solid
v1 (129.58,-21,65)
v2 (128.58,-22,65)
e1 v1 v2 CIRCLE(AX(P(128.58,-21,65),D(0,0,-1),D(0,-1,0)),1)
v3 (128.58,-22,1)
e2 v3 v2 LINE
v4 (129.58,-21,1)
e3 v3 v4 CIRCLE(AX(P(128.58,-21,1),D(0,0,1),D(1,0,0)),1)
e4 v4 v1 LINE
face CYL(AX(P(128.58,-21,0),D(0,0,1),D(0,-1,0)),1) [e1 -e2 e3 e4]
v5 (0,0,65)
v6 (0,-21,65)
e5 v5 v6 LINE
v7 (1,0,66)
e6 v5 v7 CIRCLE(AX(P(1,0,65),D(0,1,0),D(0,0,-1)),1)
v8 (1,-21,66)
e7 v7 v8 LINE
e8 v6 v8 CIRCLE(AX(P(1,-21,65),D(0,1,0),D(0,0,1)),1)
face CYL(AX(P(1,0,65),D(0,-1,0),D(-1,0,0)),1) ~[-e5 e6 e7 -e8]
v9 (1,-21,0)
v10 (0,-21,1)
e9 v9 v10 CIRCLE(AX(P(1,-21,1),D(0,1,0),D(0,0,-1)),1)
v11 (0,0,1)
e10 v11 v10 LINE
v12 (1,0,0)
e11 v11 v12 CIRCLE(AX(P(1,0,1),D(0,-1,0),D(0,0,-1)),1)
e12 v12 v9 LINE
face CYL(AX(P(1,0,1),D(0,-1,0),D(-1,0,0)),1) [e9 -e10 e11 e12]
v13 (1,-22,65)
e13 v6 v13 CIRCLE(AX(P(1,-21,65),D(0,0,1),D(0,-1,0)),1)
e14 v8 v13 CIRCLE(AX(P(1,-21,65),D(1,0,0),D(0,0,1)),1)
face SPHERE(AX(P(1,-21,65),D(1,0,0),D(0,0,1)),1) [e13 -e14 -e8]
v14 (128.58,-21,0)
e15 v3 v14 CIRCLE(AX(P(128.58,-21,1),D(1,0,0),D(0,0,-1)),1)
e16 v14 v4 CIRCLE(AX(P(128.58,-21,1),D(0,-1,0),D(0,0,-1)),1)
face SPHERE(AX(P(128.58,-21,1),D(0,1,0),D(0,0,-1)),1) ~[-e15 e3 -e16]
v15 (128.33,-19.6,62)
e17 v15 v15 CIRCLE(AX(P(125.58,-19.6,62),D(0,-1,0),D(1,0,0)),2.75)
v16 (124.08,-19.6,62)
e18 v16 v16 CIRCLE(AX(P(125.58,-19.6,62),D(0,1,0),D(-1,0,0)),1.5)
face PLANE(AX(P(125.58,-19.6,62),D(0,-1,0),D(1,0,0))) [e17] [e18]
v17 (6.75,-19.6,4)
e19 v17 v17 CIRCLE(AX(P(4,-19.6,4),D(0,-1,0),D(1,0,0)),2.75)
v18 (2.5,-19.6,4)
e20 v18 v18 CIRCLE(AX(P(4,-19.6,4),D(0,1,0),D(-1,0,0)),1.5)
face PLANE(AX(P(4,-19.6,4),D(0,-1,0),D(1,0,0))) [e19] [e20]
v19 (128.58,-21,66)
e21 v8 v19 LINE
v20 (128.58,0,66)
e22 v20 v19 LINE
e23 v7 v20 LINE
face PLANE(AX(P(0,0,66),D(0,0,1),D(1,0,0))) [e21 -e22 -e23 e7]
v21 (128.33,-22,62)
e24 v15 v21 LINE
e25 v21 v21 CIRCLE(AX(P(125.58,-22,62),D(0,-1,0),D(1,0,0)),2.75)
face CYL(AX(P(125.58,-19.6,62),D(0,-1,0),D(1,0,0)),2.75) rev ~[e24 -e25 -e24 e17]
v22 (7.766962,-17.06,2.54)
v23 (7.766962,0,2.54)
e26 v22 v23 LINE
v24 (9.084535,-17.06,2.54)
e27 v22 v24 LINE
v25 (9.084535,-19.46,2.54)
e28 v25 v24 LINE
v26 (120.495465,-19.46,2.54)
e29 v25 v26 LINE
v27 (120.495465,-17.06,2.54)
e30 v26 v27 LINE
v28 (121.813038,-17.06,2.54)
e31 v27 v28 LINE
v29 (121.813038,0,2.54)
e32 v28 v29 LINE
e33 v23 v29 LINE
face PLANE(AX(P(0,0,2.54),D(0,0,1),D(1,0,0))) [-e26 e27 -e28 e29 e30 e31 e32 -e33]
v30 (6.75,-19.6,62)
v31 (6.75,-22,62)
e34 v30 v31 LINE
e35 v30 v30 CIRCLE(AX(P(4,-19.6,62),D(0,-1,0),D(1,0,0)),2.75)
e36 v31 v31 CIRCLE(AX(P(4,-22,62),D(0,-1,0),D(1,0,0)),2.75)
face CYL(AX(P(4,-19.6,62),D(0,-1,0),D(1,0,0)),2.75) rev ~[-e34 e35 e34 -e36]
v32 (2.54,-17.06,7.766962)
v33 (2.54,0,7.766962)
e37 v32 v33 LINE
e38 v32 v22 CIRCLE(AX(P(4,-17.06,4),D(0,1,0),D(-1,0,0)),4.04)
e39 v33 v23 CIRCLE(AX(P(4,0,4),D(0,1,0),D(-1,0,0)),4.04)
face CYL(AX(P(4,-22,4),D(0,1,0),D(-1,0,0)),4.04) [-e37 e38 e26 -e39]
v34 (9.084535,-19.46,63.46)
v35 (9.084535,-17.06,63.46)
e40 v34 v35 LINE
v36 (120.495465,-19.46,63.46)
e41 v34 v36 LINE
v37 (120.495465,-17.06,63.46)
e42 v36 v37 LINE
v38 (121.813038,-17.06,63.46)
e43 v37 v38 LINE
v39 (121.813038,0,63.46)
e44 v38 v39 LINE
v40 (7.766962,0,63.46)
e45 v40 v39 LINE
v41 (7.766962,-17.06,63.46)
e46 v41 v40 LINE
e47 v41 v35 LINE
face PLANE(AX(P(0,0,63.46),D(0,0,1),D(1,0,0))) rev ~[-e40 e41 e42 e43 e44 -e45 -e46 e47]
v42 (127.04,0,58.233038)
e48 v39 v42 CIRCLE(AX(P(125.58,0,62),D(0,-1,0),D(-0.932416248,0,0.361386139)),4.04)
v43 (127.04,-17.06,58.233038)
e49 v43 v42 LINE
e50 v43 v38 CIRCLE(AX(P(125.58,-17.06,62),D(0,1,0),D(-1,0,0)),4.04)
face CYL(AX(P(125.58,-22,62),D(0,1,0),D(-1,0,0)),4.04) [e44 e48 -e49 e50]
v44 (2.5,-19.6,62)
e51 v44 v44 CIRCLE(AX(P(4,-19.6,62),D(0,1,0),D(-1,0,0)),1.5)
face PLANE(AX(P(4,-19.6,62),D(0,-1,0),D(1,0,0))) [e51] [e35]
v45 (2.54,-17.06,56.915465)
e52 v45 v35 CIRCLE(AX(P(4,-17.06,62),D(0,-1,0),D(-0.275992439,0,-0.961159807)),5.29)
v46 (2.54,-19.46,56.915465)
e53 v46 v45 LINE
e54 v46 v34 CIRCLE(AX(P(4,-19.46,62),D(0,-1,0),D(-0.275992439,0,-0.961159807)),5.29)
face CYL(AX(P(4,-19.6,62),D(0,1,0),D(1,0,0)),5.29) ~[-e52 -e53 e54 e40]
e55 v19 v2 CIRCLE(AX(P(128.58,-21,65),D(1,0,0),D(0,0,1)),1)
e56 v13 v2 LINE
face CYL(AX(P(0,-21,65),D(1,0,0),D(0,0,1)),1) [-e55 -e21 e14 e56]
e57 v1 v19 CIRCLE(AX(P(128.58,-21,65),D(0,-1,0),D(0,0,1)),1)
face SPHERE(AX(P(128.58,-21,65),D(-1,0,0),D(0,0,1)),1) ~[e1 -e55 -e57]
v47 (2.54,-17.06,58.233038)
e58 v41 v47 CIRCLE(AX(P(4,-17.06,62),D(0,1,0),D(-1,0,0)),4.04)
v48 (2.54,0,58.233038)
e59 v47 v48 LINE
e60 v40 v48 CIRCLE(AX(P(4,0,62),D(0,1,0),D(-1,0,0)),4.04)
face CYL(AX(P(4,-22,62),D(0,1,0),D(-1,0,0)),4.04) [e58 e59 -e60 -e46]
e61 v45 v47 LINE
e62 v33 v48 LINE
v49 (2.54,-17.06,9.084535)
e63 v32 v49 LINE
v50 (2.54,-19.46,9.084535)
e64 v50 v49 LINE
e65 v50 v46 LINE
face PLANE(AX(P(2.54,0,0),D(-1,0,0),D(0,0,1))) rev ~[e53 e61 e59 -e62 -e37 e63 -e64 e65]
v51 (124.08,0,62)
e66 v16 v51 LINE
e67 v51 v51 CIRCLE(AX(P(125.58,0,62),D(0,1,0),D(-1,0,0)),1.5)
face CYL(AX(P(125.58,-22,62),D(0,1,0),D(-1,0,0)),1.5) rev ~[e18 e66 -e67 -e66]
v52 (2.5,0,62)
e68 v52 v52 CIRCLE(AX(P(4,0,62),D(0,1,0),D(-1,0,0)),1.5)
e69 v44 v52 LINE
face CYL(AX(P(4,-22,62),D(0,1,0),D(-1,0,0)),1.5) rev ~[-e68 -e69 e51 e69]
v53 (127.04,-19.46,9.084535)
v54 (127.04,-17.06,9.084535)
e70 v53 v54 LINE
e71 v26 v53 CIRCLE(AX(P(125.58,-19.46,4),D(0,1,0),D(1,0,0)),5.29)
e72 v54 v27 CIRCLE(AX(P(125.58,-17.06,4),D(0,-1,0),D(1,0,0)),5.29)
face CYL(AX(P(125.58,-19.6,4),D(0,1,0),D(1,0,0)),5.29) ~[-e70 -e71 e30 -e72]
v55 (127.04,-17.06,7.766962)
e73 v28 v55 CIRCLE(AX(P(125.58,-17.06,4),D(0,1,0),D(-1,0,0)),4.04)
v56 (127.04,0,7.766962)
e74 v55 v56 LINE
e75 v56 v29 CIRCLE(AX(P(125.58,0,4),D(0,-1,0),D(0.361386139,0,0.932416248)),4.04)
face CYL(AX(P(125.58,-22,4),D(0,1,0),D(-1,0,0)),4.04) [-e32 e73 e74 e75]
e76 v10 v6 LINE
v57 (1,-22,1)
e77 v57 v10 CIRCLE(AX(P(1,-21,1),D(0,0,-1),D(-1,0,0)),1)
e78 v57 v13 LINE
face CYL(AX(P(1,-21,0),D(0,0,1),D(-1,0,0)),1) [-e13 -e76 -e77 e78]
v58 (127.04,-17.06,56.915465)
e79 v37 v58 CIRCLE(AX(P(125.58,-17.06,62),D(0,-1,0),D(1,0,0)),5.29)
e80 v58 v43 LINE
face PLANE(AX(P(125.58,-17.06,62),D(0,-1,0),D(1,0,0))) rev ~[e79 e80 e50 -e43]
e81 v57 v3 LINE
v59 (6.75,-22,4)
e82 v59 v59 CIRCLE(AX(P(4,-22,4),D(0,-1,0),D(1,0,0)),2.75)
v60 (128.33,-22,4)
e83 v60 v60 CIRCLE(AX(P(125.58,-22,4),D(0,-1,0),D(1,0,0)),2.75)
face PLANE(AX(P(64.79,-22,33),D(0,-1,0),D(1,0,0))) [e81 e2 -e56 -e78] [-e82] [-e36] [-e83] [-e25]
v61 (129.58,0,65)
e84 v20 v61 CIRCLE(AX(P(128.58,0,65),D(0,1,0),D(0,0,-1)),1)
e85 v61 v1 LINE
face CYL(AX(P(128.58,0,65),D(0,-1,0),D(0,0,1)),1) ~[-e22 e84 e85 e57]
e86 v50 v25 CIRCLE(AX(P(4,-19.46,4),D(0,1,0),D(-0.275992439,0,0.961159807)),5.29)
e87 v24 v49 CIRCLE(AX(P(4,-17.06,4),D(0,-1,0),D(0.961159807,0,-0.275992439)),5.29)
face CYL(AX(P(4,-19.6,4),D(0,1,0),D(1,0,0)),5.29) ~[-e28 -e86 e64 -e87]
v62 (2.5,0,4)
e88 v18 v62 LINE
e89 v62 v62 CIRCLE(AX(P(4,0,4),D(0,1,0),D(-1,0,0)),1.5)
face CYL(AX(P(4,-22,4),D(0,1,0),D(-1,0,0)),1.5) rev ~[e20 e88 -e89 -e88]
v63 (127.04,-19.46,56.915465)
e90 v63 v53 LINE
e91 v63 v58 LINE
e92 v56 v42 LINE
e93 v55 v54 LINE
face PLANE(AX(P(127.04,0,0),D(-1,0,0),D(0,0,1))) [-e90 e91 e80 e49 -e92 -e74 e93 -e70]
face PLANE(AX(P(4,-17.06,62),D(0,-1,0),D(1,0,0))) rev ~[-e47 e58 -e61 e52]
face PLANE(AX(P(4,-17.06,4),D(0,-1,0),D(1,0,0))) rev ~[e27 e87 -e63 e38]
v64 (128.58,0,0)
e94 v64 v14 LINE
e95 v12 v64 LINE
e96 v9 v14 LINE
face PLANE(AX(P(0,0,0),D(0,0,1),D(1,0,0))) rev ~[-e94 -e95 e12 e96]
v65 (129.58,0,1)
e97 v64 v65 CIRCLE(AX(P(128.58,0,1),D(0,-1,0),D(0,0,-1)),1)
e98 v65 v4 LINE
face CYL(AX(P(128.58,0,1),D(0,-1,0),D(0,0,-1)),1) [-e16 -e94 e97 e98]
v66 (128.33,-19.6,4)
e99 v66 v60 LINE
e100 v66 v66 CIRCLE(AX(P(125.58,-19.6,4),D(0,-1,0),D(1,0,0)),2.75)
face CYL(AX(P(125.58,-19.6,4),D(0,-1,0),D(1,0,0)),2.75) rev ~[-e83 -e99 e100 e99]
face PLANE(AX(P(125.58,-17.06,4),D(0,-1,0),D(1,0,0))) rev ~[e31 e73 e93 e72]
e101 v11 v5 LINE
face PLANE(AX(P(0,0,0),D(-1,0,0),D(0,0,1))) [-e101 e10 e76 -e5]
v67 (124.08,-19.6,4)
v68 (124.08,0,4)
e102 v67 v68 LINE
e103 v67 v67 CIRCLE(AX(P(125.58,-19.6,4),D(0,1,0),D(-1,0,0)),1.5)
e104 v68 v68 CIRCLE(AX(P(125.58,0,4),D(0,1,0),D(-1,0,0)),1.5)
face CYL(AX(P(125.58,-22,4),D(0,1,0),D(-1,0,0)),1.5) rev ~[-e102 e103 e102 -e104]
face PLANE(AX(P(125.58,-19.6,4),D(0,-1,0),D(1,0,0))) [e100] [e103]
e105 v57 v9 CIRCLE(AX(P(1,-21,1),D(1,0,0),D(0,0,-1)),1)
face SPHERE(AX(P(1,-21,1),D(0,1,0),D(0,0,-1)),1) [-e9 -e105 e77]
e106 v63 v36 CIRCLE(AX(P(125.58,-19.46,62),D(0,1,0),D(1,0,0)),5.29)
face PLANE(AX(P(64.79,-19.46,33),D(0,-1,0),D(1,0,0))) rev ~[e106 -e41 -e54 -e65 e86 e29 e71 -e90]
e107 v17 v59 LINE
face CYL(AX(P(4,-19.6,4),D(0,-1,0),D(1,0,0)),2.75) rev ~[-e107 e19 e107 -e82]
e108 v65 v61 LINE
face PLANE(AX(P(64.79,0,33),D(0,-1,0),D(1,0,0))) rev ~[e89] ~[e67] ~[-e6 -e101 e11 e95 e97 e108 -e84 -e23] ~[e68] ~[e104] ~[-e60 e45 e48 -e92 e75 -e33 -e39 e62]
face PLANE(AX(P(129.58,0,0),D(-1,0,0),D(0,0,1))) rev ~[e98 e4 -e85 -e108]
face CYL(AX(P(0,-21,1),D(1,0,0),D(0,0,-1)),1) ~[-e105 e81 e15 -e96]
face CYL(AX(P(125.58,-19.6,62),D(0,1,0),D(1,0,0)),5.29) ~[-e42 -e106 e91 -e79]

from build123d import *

# Parameters (mm, degrees)
F0_W           = 129.58
F0_H           = 66
F1_DEPTH       = 22
F3_D           = 3
F3_CBORE_D     = 5.5
F3_CBORE_DEPTH = 2.4
F4_T           = 2.54
F5_R           = 1


# Not quite as in the source:
# - a shell that OpenCascade refuses in one call is made with other operations: the cavity is built on its own and cut out


with BuildPart() as f1:
    # F0 (on Front) → F1 (new body)
    with BuildSketch(Plane.XZ):
        with Locations((64.79, 33)):
            Rectangle(F0_W, F0_H)
    extrude(amount=F1_DEPTH)

    # F3 (through all)
    with Locations(Plane.XZ.offset(22)):
        with Locations((4, 62), (4, 4), (125.58, 4), (125.58, 62)):
            CounterBoreHole(F3_D / 2, F3_CBORE_D / 2, F3_CBORE_DEPTH)

    # F4: shell of thickness 2.54, made by hand


with BuildPart() as f4_core1:
    # F4_t2: copy of F1
    add(f1.part)

    # the walls: a layer under each face that stays
    f4_faces = [f4_core1.faces().sort_by_distance(p)[0] for p in [
        (0, -11, 33),
        (64.79, -11, 66),
        (64.79, -11, 0),
        (64.79, -22, 33),
        (129.58, -11, 33),
        (2.5, -9.8, 4),
        (124.08, -9.8, 4),
        (2.5, -9.8, 62),
        (124.08, -9.8, 62),
        (1.25, -20.8, 4),
        (122.83, -20.8, 4),
        (1.25, -20.8, 62),
        (122.83, -20.8, 62),
        (2.1666666667, -19.6, 2.1666666667),
        (123.7466666667, -19.6, 2.1666666667),
        (2.1666666667, -19.6, 60.1666666667),
        (123.7466666667, -19.6, 60.1666666667),
    ]]
    thicken(f4_faces, amount=-F4_T, mode=Mode.SUBTRACT)

    # F4_s3 → F4_t4 (revolve, cut)
    with BuildSketch(Plane.XY.offset(4)):
        Polygon((6.7246, -19.6254), (9.29, -19.6), (9.29, -17.06), (6.75, -17.06), align=None)
    revolve(axis=Axis((4, -19.6, 4), (0, -1, 0)), mode=Mode.SUBTRACT)

    # F4_s5 → F4_t6 (revolve, cut)
    with BuildSketch(Plane.XY.offset(4)):
        Polygon((128.3046, -19.6254), (130.87, -19.6), (130.87, -17.06), (128.33, -17.06), align=None)
    revolve(axis=Axis((125.58, -19.6, 4), (0, -1, 0)), mode=Mode.SUBTRACT)

    # F4_s7 → F4_t8 (revolve, cut)
    with BuildSketch(Plane.XY.offset(62)):
        Polygon((6.7246, -19.6254), (9.29, -19.6), (9.29, -17.06), (6.75, -17.06), align=None)
    revolve(axis=Axis((4, -19.6, 62), (0, -1, 0)), mode=Mode.SUBTRACT)

    # F4_s9 → F4_t10 (revolve, cut)
    with BuildSketch(Plane.XY.offset(62)):
        Polygon((128.3046, -19.6254), (130.87, -19.6), (130.87, -17.06), (128.33, -17.06), align=None)
    revolve(axis=Axis((125.58, -19.6, 62), (0, -1, 0)), mode=Mode.SUBTRACT)


with BuildPart() as f1_1:
    add(f1.part)

    # what is left inside the walls is the cavity
    f4_cavity = [f4_core1.part.solids().sort_by_distance(p)[0] for p in [
        (64.79, -0.0254, 22.846667),
    ]]
    add(f4_cavity, mode=Mode.SUBTRACT)

    # F5
    f5_edges = [f1_1.edges().sort_by_distance(p)[0] for p in [
        (64.79, -22, 66),
        (0, -11, 66),
        (0, -11, 0),
        (129.58, -11, 66),
        (129.58, -11, 0),
        (64.79, -22, 0),
        (129.58, -22, 33),
        (0, -22, 33),
    ]]
    fillet(f5_edges, radius=F5_R)


solid = f1_1.part
